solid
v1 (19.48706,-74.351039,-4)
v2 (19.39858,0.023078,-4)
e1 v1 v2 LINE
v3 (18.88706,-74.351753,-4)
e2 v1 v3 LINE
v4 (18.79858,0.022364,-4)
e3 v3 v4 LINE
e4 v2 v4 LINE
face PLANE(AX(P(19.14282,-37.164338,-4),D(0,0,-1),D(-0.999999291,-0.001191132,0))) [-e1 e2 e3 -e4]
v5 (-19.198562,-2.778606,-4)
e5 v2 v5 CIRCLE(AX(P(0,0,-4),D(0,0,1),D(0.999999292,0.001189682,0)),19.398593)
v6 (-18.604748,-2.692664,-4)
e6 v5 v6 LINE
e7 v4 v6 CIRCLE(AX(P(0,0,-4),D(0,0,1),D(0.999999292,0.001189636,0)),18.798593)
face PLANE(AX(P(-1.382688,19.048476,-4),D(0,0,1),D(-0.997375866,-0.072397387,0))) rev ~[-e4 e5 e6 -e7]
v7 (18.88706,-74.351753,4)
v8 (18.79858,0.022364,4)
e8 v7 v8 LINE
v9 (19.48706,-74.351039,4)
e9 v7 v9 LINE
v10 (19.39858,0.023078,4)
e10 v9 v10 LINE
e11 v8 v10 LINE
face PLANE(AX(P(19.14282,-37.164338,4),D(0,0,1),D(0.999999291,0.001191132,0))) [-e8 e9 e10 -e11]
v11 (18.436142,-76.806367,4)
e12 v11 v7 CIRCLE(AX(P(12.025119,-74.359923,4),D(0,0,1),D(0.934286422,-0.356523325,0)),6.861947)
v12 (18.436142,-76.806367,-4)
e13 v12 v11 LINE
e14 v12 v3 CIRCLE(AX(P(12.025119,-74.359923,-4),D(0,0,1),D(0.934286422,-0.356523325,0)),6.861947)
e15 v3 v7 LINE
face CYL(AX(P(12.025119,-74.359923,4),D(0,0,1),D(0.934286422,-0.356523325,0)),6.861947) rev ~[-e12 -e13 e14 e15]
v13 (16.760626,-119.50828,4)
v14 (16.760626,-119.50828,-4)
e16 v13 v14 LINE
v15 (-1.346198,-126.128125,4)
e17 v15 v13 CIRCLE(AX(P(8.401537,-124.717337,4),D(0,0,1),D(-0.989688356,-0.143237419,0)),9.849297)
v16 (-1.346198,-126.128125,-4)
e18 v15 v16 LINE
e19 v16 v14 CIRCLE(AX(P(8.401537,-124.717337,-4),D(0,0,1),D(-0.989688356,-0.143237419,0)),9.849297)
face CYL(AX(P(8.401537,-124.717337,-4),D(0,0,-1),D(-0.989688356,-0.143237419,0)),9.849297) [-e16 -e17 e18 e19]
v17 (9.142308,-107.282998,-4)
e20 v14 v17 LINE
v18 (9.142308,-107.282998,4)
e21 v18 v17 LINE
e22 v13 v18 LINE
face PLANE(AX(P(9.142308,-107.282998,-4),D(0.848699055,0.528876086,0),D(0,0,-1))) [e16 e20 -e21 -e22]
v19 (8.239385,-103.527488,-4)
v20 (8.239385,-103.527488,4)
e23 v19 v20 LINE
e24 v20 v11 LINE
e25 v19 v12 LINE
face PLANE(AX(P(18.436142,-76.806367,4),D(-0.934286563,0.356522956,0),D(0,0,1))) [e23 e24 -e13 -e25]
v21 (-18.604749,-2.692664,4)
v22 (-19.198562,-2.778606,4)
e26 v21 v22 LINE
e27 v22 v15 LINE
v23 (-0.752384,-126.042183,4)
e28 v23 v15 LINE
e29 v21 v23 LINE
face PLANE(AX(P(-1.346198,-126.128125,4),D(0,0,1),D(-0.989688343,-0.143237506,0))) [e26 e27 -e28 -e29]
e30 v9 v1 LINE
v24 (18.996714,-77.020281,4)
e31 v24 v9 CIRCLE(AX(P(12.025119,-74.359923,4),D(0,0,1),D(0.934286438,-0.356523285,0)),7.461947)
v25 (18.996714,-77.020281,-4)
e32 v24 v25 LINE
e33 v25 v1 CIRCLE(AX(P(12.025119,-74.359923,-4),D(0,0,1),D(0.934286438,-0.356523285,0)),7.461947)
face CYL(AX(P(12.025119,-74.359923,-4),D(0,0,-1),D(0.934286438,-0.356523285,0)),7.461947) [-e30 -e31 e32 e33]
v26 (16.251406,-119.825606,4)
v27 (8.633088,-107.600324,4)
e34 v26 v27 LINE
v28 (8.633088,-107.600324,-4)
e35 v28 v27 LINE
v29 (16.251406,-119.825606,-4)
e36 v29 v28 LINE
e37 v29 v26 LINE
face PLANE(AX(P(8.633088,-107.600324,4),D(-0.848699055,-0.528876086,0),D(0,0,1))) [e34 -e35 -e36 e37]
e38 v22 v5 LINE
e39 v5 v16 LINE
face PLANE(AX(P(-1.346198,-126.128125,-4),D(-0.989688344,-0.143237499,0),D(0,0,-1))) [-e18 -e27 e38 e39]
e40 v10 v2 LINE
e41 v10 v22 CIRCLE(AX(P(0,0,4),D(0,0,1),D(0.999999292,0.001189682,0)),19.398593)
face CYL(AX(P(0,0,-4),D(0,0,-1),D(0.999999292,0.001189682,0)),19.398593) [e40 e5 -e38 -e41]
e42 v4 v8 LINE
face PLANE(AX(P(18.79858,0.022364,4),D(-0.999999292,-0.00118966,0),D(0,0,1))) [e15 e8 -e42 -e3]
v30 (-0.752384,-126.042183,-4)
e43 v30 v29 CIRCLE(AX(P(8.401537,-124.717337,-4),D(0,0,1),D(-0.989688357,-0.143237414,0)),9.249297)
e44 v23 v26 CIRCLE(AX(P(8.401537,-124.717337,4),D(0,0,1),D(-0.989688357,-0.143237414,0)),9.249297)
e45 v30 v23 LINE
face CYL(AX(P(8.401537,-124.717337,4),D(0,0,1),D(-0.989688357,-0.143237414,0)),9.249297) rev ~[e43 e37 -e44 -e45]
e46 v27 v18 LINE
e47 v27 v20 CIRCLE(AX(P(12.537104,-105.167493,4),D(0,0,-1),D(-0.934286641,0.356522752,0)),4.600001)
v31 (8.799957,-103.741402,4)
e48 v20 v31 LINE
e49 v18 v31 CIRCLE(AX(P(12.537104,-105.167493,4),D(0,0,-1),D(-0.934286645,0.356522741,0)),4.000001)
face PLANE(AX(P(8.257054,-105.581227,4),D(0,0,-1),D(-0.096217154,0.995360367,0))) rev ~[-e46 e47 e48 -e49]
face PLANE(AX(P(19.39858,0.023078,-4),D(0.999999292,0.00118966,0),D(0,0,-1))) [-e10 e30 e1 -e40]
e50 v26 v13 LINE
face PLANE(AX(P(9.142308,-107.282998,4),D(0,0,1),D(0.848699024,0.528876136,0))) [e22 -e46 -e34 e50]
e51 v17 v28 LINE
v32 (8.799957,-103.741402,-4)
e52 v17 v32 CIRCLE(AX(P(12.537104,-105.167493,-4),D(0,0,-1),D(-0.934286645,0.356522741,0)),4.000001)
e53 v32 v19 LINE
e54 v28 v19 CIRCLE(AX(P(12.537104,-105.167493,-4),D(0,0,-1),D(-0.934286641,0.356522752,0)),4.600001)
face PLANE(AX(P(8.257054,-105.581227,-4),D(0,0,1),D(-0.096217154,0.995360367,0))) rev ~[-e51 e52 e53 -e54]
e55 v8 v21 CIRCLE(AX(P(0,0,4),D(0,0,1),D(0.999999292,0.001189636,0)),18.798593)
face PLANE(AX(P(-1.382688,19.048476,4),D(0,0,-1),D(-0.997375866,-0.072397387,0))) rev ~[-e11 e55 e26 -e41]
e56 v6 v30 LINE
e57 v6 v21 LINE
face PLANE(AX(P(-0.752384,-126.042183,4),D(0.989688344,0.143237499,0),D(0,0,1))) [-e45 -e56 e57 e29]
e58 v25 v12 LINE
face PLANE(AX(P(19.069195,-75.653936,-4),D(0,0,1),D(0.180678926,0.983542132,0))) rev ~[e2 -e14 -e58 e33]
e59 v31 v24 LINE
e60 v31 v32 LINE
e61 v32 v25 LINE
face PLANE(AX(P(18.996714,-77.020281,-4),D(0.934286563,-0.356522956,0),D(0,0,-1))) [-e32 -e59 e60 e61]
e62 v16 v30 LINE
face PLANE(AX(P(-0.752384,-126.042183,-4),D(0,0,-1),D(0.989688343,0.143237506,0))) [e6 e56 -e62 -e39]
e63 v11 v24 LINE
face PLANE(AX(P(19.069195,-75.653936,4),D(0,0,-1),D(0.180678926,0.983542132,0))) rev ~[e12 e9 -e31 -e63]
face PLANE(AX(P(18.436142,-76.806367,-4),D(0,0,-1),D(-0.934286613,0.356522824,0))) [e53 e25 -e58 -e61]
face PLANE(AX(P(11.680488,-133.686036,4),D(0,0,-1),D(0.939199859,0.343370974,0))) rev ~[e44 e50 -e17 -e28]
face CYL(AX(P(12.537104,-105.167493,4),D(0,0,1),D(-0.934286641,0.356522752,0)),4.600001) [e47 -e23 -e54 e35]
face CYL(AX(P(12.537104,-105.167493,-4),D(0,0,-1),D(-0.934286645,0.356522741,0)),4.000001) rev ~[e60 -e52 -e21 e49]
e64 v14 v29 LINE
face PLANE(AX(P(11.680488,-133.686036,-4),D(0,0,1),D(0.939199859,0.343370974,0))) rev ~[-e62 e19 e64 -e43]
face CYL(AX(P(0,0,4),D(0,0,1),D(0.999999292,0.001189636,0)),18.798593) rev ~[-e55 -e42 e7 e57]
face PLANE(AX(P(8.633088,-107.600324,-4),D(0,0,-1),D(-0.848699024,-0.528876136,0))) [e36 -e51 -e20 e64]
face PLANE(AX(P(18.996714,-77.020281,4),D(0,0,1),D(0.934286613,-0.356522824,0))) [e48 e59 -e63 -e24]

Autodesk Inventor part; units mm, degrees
sketch "スケッチ パス" plane through (0, 0, 0) normal (0, 0, 1) x (1, 0, 0)
  arc A0 (19.09858, 0.022721) -> (-18.901655, -2.735635) centre (0, 0) ccw
  arc A1 (18.716428, -76.913324) -> (19.18706, -74.351396) centre (12.025093, -74.359916) ccw
  arc A2 (8.519671, -103.634445) -> (8.887698, -107.441661) centre (12.537104, -105.167493) ccw
  arc A3 (-1.049291, -126.085154) -> (16.506016, -119.666943) centre (8.401537, -124.717337) ccw
  line L0 (-1.049291, -126.085154) -> (-18.901655, -2.735635)
  line L1 (19.09858, 0.022721) -> (19.18706, -74.351396)
  line L2 (18.716428, -76.913324) -> (8.519671, -103.634445)
  line L3 (8.887698, -107.441661) -> (16.506016, -119.666943)
ref_plane "断面平面" through (-18.901655, -2.735635, 0) normal (0.1432375, -0.9896883, 0) x (0, 0, 1)
ref_plane "作業平面2" through (0, 0, 0) normal (-1, 0, 0) x (0, 0, 1)
ref_plane "作業平面3" through (8.401537, -124.717337, 0) normal (-0.4316004, 0.9020649, 0) x (0, 0, 1)
ref_plane "作業平面4" through (12.025093, -74.359916, 0) normal (0.0892463, 0.9960096, 0) x (0, 0, 1)
sketch "断面" plane through (-18.901655, -2.735635, 0) normal (0.1432375, -0.9896883, 0) x (0, 0, 1)
  line L0 (-4, 0.3) -> (4, 0.3)
  line L1 (4, 0.3) -> (4, -0.3)
  line L2 (4, -0.3) -> (-4, -0.3)
  line L3 (-4, -0.3) -> (-4, 0.3)
  line L4 (-4, 0) -> (4, 0) construction
  point P0 (0, 0)
  point P1 (0, 0)
  dimension "d0" = 8
  dimension "d4" = 0.3
  dimension "d5" = 0.3
sweep "ベルト" add profiles "断面" path "スケッチ パス"
equation "\"d4\" = da_a"
equation "\"d5\" = da_a2"
equation "\"da_B\" = 6"
equation "\"da_pb\" = 2.5"
equation "\"da_L\" = 345.26878"
equation "\"da_a\" = 0.3"
equation "\"da_S\" = 1.5"
equation "\"da_Beta\" = 20deg"
equation "\"da_Ht\" = 0.7"
equation "\"da_H\" = 1.3"
equation "\"da_a2\" = 0.3"
properties part number "歯付きベルト" material "Rubber"
